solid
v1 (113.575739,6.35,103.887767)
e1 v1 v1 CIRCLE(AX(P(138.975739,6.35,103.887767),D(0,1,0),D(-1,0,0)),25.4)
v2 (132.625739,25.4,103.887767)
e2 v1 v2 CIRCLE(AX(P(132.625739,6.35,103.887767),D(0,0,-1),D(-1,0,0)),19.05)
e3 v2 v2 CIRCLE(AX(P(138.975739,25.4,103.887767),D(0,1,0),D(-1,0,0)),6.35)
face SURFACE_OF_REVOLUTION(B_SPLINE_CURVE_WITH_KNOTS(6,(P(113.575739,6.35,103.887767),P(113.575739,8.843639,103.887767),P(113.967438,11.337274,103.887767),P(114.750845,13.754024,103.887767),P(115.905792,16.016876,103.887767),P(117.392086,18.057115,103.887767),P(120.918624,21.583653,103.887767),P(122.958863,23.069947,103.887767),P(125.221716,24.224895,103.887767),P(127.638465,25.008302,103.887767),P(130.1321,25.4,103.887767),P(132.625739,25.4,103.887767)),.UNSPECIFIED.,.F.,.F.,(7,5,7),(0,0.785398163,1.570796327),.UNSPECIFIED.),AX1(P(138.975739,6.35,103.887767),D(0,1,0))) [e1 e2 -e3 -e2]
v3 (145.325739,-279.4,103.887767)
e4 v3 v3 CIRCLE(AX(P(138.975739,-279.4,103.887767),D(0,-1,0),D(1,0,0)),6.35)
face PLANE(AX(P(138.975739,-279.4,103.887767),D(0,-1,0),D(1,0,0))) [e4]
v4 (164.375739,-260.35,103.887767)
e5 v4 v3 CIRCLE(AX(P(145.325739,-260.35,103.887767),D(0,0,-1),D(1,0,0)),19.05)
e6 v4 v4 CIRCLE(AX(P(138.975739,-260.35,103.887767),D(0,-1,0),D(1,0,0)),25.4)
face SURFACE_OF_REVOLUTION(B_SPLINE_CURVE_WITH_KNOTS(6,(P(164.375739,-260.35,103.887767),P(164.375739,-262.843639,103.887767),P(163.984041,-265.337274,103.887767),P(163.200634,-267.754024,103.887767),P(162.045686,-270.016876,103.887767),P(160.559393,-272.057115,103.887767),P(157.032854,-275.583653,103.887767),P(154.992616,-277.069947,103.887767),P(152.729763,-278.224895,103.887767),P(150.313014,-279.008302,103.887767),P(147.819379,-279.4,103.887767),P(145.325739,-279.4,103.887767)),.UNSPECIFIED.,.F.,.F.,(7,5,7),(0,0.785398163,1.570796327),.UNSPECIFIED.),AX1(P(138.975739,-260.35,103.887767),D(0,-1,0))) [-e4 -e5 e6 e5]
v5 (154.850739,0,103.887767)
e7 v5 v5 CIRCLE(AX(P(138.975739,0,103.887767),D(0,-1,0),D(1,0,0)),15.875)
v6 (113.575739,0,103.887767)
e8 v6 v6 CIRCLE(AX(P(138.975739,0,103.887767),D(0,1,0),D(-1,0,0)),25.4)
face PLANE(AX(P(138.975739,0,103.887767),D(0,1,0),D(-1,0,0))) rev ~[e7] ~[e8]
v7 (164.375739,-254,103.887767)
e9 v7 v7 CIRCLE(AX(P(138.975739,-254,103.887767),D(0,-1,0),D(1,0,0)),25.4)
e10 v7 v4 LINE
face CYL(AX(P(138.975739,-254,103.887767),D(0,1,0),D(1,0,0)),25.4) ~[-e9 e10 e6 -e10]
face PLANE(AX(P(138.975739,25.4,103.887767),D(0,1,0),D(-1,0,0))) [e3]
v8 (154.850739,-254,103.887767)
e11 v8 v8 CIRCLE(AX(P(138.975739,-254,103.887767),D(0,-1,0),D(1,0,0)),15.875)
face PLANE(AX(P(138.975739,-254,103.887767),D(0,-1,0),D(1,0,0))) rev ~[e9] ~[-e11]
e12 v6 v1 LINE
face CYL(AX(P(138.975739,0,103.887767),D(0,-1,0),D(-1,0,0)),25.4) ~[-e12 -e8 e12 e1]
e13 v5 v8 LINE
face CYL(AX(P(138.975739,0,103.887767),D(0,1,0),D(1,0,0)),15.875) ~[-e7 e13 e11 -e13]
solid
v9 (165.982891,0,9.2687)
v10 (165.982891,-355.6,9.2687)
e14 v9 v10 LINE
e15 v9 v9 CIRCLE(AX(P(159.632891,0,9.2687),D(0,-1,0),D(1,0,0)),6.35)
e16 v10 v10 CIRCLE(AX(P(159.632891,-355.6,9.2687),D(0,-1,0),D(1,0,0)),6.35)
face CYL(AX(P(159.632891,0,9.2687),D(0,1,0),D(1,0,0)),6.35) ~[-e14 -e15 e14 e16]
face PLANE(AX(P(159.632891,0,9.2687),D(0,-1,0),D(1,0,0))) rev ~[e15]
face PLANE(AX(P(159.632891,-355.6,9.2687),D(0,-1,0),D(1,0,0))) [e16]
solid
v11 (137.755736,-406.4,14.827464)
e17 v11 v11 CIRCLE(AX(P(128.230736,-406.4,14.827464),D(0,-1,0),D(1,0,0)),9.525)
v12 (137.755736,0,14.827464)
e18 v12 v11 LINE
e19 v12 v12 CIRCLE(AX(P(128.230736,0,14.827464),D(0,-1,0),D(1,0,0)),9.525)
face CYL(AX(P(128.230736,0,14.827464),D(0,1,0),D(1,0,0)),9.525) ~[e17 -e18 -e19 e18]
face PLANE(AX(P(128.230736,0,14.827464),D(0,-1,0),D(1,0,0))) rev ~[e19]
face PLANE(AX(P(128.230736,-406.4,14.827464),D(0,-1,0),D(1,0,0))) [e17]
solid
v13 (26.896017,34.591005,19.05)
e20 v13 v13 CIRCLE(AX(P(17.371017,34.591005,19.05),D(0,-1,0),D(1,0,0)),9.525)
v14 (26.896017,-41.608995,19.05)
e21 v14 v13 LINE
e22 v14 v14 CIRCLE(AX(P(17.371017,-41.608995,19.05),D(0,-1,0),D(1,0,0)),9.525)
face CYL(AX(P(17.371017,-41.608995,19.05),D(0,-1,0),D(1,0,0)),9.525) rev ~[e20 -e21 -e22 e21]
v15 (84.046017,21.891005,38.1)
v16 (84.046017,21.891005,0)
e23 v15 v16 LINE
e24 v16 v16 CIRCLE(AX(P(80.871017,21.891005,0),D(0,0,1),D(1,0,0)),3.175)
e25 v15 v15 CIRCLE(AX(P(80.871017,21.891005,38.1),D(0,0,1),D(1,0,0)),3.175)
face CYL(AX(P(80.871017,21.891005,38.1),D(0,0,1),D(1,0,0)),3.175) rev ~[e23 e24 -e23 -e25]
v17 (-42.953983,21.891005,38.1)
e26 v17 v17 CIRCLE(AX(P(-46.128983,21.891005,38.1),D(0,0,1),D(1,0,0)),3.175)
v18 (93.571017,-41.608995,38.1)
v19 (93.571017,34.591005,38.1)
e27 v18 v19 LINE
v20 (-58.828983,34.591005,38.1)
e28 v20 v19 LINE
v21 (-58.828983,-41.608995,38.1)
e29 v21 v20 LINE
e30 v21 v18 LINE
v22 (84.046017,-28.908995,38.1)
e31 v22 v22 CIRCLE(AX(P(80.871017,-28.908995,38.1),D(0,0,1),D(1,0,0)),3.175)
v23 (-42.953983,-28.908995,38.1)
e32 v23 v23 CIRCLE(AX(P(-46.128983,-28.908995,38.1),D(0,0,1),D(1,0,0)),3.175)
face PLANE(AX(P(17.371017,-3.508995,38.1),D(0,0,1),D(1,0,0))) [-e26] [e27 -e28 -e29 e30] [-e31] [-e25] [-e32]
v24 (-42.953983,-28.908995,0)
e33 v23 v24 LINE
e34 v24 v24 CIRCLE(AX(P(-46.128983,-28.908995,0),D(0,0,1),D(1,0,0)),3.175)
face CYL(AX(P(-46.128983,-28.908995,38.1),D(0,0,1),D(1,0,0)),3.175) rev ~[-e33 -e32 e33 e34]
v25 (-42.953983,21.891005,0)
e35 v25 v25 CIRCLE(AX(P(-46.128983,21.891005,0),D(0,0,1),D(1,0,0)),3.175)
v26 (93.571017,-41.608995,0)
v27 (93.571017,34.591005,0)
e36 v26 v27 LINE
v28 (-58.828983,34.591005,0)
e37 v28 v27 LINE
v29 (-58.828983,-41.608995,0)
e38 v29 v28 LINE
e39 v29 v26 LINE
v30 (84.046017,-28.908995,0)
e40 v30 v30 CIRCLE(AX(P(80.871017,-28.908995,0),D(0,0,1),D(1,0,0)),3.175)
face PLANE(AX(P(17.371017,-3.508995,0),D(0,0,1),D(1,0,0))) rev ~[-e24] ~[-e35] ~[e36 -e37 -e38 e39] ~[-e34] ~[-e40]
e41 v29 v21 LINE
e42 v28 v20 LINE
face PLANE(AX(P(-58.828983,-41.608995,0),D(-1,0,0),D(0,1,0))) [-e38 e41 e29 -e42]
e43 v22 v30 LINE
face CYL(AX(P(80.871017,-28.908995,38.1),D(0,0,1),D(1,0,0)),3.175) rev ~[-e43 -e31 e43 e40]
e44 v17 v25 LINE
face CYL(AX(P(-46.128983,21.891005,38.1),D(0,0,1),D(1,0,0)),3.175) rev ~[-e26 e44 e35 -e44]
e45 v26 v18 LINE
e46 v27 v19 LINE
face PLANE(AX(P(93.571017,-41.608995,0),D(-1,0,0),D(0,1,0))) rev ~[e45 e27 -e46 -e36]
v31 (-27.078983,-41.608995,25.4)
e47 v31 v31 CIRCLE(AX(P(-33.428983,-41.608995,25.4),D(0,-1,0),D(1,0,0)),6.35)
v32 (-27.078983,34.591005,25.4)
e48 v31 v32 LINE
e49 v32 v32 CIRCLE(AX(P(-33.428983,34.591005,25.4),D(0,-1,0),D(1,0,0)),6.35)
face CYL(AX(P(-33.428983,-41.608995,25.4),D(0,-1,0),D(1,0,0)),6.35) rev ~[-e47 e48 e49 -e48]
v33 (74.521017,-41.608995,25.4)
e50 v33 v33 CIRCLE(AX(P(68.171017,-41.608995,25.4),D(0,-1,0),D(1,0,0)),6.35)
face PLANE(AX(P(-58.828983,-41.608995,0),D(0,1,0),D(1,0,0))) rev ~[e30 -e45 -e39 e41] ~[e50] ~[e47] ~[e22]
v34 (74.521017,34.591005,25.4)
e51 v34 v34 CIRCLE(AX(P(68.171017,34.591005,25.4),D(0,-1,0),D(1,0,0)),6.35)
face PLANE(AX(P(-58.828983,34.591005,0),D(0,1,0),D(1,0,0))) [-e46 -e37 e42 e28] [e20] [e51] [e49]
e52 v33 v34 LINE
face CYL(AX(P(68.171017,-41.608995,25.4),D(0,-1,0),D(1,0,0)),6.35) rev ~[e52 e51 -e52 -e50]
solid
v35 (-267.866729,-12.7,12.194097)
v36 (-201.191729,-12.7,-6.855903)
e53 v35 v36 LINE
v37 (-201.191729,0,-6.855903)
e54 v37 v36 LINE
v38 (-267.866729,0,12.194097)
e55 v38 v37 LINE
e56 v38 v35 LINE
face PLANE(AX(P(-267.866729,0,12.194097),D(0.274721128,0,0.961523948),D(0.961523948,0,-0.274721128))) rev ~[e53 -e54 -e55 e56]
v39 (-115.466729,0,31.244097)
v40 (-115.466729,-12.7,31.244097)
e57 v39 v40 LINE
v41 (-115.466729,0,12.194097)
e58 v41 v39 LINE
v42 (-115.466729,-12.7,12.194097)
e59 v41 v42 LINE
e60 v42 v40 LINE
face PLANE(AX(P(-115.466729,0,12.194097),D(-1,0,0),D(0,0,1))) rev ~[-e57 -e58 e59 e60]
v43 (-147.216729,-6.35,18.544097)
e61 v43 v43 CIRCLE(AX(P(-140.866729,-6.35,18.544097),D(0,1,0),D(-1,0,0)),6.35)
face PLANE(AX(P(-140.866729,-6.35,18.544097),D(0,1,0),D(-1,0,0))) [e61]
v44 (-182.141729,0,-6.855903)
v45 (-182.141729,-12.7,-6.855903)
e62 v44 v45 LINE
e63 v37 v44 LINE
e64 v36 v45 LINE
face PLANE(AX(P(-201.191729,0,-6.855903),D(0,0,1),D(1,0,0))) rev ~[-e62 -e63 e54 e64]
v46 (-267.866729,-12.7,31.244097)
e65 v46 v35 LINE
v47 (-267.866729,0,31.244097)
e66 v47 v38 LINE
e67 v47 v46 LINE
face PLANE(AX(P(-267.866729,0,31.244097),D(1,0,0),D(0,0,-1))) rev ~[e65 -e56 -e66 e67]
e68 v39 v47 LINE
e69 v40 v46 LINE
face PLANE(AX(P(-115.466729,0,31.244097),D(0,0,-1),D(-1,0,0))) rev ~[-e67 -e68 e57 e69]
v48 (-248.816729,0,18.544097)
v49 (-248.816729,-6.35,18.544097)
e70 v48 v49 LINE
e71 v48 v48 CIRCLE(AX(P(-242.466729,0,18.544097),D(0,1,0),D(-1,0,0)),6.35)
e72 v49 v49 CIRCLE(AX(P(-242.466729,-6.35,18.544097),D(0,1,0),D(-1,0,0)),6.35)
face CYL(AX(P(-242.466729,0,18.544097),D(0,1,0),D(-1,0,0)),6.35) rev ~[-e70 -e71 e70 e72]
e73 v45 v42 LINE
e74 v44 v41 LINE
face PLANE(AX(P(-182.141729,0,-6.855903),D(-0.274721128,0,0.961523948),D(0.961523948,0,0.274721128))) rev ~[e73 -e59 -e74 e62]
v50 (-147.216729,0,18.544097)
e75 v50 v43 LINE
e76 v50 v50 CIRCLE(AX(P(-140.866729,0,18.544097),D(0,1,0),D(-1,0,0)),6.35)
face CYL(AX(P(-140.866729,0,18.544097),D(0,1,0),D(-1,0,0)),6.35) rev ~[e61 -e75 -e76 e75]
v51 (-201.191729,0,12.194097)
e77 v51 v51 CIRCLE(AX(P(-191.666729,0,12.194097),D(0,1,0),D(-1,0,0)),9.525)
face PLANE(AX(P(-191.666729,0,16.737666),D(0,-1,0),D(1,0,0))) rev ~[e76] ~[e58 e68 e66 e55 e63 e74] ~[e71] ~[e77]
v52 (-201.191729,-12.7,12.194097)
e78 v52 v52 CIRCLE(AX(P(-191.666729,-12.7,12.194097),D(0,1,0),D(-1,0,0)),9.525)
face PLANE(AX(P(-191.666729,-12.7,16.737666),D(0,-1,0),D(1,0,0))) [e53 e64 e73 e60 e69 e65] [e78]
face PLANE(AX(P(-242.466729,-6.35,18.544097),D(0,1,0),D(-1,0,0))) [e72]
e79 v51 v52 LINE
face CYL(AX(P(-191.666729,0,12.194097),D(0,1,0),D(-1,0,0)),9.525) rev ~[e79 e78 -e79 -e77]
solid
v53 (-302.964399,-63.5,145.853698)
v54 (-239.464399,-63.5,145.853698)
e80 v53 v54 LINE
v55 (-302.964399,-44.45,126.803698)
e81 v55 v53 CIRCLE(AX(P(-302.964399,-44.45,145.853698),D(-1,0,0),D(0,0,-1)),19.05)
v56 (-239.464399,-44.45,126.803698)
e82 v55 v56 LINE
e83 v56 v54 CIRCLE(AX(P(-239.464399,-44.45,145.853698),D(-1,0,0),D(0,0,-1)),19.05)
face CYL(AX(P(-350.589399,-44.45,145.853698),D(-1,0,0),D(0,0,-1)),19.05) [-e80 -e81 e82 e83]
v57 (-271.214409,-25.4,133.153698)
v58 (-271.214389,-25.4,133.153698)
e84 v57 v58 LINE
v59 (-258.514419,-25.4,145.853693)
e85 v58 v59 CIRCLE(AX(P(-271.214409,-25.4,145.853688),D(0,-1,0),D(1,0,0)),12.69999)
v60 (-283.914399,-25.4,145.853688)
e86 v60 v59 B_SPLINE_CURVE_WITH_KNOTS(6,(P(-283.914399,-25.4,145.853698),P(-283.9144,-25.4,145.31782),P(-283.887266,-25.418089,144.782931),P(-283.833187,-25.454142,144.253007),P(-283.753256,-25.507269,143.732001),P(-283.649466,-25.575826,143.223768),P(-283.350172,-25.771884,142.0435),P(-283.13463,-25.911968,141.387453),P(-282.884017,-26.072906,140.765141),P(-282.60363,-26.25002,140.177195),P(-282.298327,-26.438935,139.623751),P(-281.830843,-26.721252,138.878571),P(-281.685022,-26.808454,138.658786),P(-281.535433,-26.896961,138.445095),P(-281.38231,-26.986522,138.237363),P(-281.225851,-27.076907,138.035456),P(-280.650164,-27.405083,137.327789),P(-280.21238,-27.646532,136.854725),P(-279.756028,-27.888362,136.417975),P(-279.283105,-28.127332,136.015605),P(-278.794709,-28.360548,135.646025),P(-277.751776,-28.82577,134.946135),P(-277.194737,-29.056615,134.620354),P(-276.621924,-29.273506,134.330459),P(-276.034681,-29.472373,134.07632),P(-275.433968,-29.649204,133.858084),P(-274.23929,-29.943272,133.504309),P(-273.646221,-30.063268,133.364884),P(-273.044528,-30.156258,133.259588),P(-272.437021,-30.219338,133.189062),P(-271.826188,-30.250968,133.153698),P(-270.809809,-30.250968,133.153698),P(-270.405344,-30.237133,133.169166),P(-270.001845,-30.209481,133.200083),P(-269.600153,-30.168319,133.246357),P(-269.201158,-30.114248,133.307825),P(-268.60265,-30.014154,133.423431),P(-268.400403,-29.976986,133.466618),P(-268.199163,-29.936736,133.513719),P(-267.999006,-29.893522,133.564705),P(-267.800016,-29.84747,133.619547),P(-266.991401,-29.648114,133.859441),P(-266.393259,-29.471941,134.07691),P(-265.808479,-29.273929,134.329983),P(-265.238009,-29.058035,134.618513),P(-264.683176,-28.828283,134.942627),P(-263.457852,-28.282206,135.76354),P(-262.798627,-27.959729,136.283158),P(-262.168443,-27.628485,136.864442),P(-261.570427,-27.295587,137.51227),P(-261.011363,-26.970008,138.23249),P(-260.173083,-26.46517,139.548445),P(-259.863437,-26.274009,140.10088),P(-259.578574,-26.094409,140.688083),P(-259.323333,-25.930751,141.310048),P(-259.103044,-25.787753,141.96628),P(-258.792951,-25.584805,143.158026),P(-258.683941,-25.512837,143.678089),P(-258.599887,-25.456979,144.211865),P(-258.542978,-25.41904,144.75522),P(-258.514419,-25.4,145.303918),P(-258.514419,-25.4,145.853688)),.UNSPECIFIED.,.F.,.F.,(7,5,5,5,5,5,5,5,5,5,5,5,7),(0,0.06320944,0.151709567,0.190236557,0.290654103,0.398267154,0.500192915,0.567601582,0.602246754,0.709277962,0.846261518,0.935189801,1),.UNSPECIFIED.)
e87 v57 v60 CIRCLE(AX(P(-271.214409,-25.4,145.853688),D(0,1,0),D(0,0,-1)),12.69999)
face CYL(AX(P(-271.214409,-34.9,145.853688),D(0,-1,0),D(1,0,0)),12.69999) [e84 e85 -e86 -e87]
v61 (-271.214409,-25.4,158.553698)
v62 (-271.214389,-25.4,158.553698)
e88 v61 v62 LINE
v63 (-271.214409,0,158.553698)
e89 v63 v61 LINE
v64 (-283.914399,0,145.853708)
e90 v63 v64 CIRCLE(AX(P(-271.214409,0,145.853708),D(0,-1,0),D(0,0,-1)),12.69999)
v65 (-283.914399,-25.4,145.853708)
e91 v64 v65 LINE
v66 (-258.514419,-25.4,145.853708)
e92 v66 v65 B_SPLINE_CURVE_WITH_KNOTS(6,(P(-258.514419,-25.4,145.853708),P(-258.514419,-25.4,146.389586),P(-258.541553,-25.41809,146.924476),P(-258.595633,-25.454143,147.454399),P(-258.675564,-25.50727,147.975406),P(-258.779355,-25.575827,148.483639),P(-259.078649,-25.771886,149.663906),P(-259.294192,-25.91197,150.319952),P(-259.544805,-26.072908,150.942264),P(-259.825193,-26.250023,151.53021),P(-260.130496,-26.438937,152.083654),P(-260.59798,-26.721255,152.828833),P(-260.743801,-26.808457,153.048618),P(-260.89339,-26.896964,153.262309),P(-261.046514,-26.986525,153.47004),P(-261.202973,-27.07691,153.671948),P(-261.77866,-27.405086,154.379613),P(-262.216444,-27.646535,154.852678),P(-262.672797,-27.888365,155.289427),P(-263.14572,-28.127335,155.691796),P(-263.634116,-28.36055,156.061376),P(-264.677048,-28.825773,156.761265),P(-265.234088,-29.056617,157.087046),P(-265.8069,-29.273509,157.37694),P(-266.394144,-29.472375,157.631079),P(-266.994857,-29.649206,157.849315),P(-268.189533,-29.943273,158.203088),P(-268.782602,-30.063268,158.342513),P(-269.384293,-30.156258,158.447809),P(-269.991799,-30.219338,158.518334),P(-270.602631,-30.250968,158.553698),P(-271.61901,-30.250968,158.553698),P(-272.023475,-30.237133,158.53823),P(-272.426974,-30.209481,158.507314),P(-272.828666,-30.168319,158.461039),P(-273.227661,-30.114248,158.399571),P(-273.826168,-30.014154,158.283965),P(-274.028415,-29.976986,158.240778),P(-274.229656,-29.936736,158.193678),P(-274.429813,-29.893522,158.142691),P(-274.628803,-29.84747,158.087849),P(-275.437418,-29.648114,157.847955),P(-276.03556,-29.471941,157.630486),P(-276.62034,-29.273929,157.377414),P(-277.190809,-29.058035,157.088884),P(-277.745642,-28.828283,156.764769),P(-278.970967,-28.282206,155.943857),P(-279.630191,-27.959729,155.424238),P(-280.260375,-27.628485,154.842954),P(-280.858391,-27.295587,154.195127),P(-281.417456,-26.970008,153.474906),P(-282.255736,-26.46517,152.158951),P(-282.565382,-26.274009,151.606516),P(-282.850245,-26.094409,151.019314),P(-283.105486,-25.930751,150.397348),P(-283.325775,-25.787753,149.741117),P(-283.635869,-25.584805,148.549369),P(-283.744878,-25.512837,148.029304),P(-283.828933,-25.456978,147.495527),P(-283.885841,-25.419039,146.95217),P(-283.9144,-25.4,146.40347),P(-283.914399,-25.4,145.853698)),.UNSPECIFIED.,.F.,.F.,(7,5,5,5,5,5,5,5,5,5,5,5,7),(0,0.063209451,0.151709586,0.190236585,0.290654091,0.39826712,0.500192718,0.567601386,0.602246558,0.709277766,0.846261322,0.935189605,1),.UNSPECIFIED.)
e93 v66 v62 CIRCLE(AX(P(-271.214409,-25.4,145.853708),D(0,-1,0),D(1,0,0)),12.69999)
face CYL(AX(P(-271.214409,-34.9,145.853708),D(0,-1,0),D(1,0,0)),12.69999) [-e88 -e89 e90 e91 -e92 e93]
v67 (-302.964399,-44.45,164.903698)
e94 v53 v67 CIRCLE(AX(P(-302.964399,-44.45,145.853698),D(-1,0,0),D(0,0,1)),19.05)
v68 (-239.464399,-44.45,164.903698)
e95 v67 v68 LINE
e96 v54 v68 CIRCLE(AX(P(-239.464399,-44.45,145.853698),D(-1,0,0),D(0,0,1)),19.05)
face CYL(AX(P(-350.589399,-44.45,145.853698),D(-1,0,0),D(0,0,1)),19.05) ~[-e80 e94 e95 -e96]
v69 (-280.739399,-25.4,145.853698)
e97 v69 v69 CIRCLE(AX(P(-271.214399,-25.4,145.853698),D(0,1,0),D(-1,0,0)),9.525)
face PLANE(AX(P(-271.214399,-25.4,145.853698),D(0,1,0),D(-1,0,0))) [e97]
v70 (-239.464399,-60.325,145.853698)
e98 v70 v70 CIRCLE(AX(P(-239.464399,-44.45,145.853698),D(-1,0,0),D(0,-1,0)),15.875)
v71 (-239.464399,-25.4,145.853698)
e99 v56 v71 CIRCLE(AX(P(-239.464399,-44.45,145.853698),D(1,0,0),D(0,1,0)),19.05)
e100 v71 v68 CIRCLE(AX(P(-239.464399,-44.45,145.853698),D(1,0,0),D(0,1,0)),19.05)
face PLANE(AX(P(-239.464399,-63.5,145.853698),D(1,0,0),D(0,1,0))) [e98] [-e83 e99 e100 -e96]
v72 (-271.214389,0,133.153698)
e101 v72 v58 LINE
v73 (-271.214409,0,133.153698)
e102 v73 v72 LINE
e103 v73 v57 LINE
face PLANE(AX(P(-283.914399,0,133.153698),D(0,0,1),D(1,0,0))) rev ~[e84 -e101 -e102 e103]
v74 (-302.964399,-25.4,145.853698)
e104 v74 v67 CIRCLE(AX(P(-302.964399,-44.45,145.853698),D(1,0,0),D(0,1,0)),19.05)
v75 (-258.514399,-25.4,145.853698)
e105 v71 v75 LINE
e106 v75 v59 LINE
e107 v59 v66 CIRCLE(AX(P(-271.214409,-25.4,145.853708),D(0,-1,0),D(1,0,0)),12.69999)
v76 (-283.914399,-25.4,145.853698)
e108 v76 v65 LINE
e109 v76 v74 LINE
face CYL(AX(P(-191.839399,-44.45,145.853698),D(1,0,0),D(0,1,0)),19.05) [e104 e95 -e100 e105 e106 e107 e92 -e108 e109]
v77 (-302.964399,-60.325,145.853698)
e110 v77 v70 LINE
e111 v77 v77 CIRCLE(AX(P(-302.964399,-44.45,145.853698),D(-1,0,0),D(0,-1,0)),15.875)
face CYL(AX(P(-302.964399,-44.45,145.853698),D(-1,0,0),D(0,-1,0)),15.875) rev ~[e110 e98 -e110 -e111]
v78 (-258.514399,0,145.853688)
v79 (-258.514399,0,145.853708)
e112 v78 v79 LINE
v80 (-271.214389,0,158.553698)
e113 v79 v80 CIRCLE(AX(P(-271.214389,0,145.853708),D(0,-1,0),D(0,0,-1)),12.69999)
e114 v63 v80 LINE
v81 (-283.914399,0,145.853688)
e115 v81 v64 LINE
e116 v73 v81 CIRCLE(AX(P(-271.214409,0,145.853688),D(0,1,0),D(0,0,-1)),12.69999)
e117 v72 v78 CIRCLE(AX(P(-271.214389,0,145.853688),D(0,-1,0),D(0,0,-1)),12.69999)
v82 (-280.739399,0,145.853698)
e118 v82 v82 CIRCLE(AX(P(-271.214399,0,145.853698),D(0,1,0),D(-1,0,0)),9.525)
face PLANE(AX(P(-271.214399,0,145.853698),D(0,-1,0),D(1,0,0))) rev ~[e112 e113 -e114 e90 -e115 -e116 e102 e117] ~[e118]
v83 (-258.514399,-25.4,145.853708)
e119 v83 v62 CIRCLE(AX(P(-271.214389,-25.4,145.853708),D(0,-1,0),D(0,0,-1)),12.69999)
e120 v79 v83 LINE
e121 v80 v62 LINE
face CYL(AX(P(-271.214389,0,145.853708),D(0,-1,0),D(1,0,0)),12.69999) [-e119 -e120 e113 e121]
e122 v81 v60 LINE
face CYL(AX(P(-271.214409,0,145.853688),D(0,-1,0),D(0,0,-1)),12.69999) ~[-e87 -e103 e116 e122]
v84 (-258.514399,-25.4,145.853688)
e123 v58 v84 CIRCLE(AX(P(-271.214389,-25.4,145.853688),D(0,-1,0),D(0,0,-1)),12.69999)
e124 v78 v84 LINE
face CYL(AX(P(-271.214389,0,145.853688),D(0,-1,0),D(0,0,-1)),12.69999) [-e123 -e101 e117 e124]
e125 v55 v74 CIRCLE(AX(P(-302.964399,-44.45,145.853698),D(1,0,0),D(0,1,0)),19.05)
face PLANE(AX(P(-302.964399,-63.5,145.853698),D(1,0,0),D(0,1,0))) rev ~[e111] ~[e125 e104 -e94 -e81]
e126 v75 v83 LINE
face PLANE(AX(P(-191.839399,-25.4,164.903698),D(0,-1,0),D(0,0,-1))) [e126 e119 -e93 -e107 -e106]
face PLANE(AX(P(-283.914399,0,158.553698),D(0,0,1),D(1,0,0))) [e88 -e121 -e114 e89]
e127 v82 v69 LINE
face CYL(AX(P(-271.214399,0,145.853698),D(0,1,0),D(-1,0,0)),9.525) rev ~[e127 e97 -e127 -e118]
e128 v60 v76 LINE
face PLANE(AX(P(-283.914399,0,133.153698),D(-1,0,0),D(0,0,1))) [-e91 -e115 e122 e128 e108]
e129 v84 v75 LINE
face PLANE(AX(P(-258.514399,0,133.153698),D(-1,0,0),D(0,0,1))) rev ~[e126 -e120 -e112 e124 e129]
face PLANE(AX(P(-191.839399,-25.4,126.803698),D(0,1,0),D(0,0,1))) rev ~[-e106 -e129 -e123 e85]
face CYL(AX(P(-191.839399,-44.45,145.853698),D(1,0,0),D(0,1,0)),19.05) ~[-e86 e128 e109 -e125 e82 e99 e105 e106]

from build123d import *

# Parameters (mm, degrees)
F0_W          = 152.4
F0_H          = 76.2
F1_DEPTH      = 38.1
F2_R          = 6.35
F2_R_2        = 9.525
F3_DEPTH      = 76.2
F4_R          = 3.175
F5_DEPTH      = 38.1
F6_R          = 6.35
F7_DEPTH      = 355.6
F8_R          = 9.525
F9_DEPTH      = 406.4
F11_DEPTH     = 12.7
F12_R         = 6.35
F13_DEPTH     = 6.35
F14_R         = 9.525
F15_DEPTH     = 25.4
F16_W         = 25.4
F16_H         = 25.4
F17_DEPTH     = 25.4
F19_W         = 63.5
F19_H         = 38.1
F20_DEPTH     = 19.05
F21_R         = 12.69999
F22_T1_DEPTH  = 158.75
F22_T6_DEPTH  = 158.75
F22_S7_R      = 12.69999
F22_T8_DEPTH  = 82
F22_T12_DEPTH = 158.75
F22_S13_R     = 12.69999
F22_T14_DEPTH = 82
F23_R         = 15.875
F24_DEPTH     = 63.5
F25_R         = 9.525
F26_DEPTH     = 25.4
F27_R         = 15.875
F28_DEPTH     = 254
F29_R         = 25.4
F30_DEPTH     = 25.4
F31_R         = 25.4
F32_DEPTH     = 25.4
F33_R         = 19.05


# Not quite as in the source:
# - a fillet or chamfer that OpenCascade refuses, or shapes differently, is made with other operations: its cross-section is extruded or revolved along the edge and cut away or added
# - a fillet or chamfer is up to 0.001 mm smaller than in the source, because OpenCascade refuses the exact size


with BuildPart() as f1:
    # F0 (on Top) → F1 (new body)
    with BuildSketch(Plane.XY):
        with Locations((17.3710167248, -3.5089952871)):
            Rectangle(F0_W, F0_H)
    extrude(amount=F1_DEPTH)

    # F2 (on face) → F3 (cut, through all)
    with BuildSketch(Plane.XZ.offset(41.6089952871)):
        with Locations((-33.4289832752, 25.4)):
            Circle(F2_R)
        with Locations((68.1710167248, 25.4)):
            Circle(F2_R)
        with Locations((17.3710167248, 19.05)):
            Circle(F2_R_2)
    extrude(amount=-F3_DEPTH, mode=Mode.SUBTRACT)

    # F4 (on face) → F5 (cut, through all)
    with BuildSketch(Plane.XY.offset(38.1)):
        with Locations((-46.1289832752, 21.8910047129)):
            Circle(F4_R)
        with Locations((-46.1289832752, -28.9089952871)):
            Circle(F4_R)
        with Locations((80.8710167248, 21.8910047129)):
            Circle(F4_R)
        with Locations((80.8710167248, -28.9089952871)):
            Circle(F4_R)
    extrude(amount=-F5_DEPTH, mode=Mode.SUBTRACT)


with BuildPart() as f7:
    # F6 (on Front) → F7 (new body)
    with BuildSketch(Plane.XZ):
        with Locations((159.6328914165, 9.2687001452)):
            Circle(F6_R)
    extrude(amount=F7_DEPTH)


with BuildPart() as f9:
    # F8 (on Front) → F9 (new body)
    with BuildSketch(Plane.XZ):
        with Locations((128.2307356596, 14.8274637759)):
            Circle(F8_R)
    extrude(amount=F9_DEPTH)


with BuildPart() as f11:
    # F10 (on Front) → F11 (new body)
    with BuildSketch(Plane.XZ):
        Polygon((-115.4667288065, 12.1940965524), (-115.4667288065, 31.2440965524), (-267.8667288065, 31.2440965524), (-267.8667288065, 12.1940965524), (-201.1917288065, -6.8559034476), (-182.1417288065, -6.8559034476), align=None)
    extrude(amount=F11_DEPTH)

    # F12 (on face) → F13 (cut)
    with BuildSketch(Plane(origin=(0, 0, 0), x_dir=(-1, 0, 0), z_dir=(0, 1, 0))):
        with Locations((242.4667288065, 18.5440965524)):
            Circle(F12_R)
        with Locations((140.8667288065, 18.5440965524)):
            Circle(F12_R)
    extrude(amount=-F13_DEPTH, mode=Mode.SUBTRACT)

    # F14 (on face) → F15 (cut)
    with BuildSketch(Plane(origin=(0, 0, 0), x_dir=(-1, 0, 0), z_dir=(0, 1, 0))):
        with Locations((191.6667288065, 12.1940965524)):
            Circle(F14_R)
    extrude(amount=-F15_DEPTH, mode=Mode.SUBTRACT)


with BuildPart() as f17:
    # F16 (on Front) → F17 (new body)
    with BuildSketch(Plane.XZ):
        with Locations((-271.2143993781, 145.8536982536)):
            Rectangle(F16_W, F16_H)
    extrude(amount=F17_DEPTH)

    # F19 (on offset) → F20 (join, symmetric)
    with BuildSketch(Plane.XY.offset(145.8536982536)):
        with Locations((-271.2143993781, -44.45)):
            Rectangle(F19_W, F19_H)
    extrude(amount=F20_DEPTH, both=True)

    # F21 (radius 12.7 in the source; OpenCascade refuses exactly that, so slightly less here)
    f21_edges = [f17.edges().sort_by_distance(p)[0] for p in [
        (-283.914399, -12.7, 158.553698),
        (-258.514399, -12.7, 158.553698),
        (-283.914399, -12.7, 133.153698),
        (-258.514399, -12.7, 133.153698),
    ]]
    fillet(f21_edges, radius=F21_R)

    # F22: fillet of radius 19.05 on 4 edges, made by hand

    # F22_s2 → F22_t1 (cut)
    with BuildSketch(Plane.YZ.offset(-350.5893993781)):
        with BuildLine():
            ThreePointArc((-44.45, 164.9036982536), (-57.9203841816, 159.3240824352), (-63.5, 145.8536982536))
            Line((-63.5, 145.8536982536), (-63.5, 164.9036982536))
            Line((-63.5, 164.9036982536), (-44.45, 164.9036982536))
        make_face()
        with BuildLine():
            ThreePointArc((-44.45, 126.8036982536), (-57.9203841816, 132.383314072), (-63.5, 145.8536982536))
            Line((-63.5, 145.8536982536), (-63.5, 126.8036982536))
            Line((-63.5, 126.8036982536), (-44.45, 126.8036982536))
        make_face()
    extrude(amount=F22_T1_DEPTH, mode=Mode.SUBTRACT)


with BuildPart() as f22_tool4:
    # F22_s5 → F22_t6 (new body)
    with BuildSketch(Plane.YZ.offset(-191.8393993781)):
        with BuildLine():
            ThreePointArc((-25.4, 145.8536982536), (-30.9796158184, 159.3240824352), (-44.45, 164.9036982536))
            Line((-44.45, 164.9036982536), (-25.4, 164.9036982536))
            Line((-25.4, 164.9036982536), (-25.4, 145.8536982536))
        make_face()
    extrude(amount=-F22_T6_DEPTH)

    # F22_s7 → F22_t8 (cut, symmetric)
    with BuildSketch(Plane.XZ.offset(34.9)):
        with Locations((-271.2144093781, 145.8537082536)):
            Circle(F22_S7_R)
    extrude(amount=F22_T8_DEPTH, both=True, mode=Mode.SUBTRACT)


with BuildPart() as f17_1:
    add(f17.part)

    # F22_t3: cut F22_tool4
    add(f22_tool4.part, mode=Mode.SUBTRACT)


with BuildPart() as f22_tool10:
    # F22_s11 → F22_t12 (new body)
    with BuildSketch(Plane.YZ.offset(-191.8393993781)):
        with BuildLine():
            ThreePointArc((-25.4, 145.8536982536), (-30.9796158184, 132.383314072), (-44.45, 126.8036982536))
            Line((-44.45, 126.8036982536), (-25.4, 126.8036982536))
            Line((-25.4, 126.8036982536), (-25.4, 145.8536982536))
        make_face()
    extrude(amount=-F22_T12_DEPTH)

    # F22_s13 → F22_t14 (cut, symmetric)
    with BuildSketch(Plane.XZ.offset(34.9)):
        with Locations((-271.2144093781, 145.8536882536)):
            Circle(F22_S13_R)
    extrude(amount=F22_T14_DEPTH, both=True, mode=Mode.SUBTRACT)


with BuildPart() as f17_2:
    add(f17_1.part)

    # F22_t9: cut F22_tool10
    add(f22_tool10.part, mode=Mode.SUBTRACT)

    # F23 (on face) → F24 (cut, through all)
    with BuildSketch(Plane(origin=(-302.9643993781, 0, 0), x_dir=(0, -1, 0), z_dir=(-1, 0, 0))):
        with Locations((44.45, 145.8536982536)):
            Circle(F23_R)
    extrude(amount=-F24_DEPTH, mode=Mode.SUBTRACT)

    # F25 (on face) → F26 (cut)
    with BuildSketch(Plane(origin=(0, 0, 0), x_dir=(-1, 0, 0), z_dir=(0, 1, 0))):
        with Locations((271.2143993781, 145.8536982536)):
            Circle(F25_R)
    extrude(amount=-F26_DEPTH, mode=Mode.SUBTRACT)


with BuildPart() as f28:
    # F27 (on Front) → F28 (new body)
    with BuildSketch(Plane.XZ):
        with Locations((138.9757394791, 103.8877665997)):
            Circle(F27_R)
    extrude(amount=F28_DEPTH)

    # F29 (on face) → F30 (join)
    with BuildSketch(Plane.XZ.offset(254)):
        with Locations((138.9757394791, 103.8877665997)):
            Circle(F29_R)
    extrude(amount=F30_DEPTH)

    # F31 (on face) → F32 (join)
    with BuildSketch(Plane(origin=(0, 0, 0), x_dir=(-1, 0, 0), z_dir=(0, 1, 0))):
        with Locations((-138.9757394791, 103.8877665997)):
            Circle(F31_R)
    extrude(amount=F32_DEPTH)

    # F33
    f33_edges = [f28.edges().sort_by_distance(p)[0] for p in [
        (113.575739, -279.4, 103.887767),
        (164.375739, 25.4, 103.887767),
    ]]
    fillet(f33_edges, radius=F33_R)


solid = Compound([f1.part, f7.part, f9.part, f11.part, f17_2.part, f28.part])
